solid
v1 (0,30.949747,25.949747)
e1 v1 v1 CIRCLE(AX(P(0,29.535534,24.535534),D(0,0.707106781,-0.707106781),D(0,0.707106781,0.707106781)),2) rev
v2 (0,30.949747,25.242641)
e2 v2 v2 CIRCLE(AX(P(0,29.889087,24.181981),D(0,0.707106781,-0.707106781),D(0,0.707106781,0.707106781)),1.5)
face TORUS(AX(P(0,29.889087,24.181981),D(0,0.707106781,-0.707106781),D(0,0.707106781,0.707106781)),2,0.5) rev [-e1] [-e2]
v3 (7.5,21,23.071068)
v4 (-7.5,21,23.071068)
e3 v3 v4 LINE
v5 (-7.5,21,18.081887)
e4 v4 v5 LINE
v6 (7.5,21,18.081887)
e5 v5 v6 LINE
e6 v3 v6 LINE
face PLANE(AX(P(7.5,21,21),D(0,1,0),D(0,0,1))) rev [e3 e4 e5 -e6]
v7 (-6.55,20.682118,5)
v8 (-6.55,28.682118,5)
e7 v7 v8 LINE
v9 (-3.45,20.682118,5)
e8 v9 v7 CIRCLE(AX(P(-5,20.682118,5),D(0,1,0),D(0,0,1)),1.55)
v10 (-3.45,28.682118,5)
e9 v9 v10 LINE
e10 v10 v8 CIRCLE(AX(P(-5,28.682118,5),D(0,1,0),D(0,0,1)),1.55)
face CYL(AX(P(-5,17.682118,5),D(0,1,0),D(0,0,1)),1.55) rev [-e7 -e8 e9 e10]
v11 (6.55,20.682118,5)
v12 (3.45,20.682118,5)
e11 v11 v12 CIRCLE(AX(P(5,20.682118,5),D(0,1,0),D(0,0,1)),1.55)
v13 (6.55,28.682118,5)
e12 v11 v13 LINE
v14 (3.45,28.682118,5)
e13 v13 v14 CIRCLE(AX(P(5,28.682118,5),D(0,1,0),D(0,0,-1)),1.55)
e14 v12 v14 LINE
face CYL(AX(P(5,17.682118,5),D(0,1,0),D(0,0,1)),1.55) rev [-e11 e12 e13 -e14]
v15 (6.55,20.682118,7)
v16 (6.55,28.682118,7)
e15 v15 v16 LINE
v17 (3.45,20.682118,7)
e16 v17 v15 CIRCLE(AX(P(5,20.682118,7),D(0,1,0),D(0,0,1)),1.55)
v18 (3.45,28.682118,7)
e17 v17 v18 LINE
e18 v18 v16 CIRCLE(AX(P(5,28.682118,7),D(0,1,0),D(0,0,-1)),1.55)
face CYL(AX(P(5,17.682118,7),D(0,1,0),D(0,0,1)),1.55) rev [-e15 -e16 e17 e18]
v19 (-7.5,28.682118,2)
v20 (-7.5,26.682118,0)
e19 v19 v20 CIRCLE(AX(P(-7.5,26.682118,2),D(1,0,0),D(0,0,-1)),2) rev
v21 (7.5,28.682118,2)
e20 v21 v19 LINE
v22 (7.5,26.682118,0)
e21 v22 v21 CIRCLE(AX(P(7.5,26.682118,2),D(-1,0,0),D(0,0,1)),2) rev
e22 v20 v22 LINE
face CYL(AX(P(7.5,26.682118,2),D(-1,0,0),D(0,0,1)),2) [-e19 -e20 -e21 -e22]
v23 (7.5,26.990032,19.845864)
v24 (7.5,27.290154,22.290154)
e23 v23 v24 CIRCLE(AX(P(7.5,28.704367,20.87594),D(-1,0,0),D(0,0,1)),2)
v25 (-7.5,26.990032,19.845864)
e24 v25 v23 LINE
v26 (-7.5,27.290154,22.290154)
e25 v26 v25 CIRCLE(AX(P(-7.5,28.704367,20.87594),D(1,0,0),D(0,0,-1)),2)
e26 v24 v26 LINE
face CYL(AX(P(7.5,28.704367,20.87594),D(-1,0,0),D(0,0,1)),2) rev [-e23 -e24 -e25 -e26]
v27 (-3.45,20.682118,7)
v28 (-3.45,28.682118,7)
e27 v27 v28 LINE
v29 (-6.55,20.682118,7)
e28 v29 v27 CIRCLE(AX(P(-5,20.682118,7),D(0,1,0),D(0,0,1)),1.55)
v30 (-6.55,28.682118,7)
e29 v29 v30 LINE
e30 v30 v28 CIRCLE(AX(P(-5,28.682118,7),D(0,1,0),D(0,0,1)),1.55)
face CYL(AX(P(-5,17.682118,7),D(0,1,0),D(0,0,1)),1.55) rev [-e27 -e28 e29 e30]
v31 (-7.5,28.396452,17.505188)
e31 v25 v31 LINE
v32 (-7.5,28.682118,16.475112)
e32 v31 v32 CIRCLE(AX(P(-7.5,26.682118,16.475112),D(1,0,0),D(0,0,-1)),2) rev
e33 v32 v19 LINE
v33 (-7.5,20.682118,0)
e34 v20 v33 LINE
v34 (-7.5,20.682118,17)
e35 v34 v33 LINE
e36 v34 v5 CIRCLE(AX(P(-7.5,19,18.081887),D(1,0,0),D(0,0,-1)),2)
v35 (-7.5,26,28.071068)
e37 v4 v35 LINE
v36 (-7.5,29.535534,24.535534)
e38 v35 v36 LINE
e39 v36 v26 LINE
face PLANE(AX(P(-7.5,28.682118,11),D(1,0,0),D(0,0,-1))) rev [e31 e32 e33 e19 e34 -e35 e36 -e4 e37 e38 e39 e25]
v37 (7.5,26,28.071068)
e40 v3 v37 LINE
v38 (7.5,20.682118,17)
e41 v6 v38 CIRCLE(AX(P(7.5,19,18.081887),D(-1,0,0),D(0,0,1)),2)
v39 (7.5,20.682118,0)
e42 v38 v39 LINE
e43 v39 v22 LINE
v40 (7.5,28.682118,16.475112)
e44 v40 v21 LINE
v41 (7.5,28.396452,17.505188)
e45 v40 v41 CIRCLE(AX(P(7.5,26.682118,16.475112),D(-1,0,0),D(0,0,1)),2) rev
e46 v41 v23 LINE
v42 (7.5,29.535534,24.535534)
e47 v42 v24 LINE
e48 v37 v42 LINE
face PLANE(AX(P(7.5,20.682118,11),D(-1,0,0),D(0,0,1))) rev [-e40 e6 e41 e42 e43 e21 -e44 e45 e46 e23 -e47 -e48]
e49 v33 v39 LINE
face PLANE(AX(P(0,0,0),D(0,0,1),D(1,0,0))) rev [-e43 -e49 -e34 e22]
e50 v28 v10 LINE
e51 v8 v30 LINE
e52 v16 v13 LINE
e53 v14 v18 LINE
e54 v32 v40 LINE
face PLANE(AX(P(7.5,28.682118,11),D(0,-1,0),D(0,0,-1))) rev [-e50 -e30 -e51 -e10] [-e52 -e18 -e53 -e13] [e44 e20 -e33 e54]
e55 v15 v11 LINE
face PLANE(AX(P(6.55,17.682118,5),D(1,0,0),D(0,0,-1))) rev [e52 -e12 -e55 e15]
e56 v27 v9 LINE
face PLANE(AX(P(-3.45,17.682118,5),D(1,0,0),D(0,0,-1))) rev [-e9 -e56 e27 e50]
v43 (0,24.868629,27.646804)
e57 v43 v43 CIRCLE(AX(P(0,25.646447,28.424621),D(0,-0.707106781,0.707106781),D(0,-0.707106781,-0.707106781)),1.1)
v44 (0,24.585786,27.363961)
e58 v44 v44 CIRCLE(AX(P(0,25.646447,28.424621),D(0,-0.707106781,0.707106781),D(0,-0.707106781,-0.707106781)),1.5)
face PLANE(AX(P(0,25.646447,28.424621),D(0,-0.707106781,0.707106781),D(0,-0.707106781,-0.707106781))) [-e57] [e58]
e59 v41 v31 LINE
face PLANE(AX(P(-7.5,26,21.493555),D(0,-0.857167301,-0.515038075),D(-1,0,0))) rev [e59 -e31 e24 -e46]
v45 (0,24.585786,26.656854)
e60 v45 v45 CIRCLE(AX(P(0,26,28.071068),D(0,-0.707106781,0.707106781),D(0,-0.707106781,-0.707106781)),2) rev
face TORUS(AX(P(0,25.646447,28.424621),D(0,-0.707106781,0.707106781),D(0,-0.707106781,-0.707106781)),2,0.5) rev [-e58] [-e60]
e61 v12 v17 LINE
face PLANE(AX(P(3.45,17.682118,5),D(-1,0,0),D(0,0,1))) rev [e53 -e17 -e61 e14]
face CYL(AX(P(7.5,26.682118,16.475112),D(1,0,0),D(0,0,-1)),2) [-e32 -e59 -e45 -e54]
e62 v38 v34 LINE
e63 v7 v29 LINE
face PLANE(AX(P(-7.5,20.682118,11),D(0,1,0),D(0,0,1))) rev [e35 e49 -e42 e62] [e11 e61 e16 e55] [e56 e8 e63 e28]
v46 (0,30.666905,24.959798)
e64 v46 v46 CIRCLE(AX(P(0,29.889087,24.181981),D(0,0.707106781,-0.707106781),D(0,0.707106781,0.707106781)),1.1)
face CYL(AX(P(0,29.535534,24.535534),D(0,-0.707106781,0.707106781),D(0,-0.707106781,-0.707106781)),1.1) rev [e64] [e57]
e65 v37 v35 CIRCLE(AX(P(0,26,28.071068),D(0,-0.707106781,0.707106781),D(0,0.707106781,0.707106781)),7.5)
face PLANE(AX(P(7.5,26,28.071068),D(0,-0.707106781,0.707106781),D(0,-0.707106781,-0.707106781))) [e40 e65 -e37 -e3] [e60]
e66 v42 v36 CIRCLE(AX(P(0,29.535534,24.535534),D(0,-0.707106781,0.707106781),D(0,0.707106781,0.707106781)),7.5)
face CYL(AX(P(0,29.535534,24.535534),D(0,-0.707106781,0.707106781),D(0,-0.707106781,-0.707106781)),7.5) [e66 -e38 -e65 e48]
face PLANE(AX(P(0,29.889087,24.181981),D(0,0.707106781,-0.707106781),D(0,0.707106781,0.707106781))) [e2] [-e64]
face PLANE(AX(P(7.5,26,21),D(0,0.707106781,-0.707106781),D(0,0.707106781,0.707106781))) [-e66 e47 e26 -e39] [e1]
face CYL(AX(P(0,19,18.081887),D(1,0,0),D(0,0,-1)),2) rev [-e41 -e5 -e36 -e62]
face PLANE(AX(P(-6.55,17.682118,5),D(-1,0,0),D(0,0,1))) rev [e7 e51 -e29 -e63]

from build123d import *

# Parameters (mm, degrees)
SKETCH_10_W         = 15
SKETCH_10_H         = 8
EXTRUDE_7_DEPTH     = 11
CUT_EXTRUDE_4_DEPTH = 11
SKETCH_12_W         = 15
SKETCH_12_H         = 6
EXTRUDE_8_DEPTH     = 6
SKETCH_14_W         = 15
SKETCH_14_H         = 5
EXTRUDE_9_DEPTH     = 4
EXTRUDE_10_DEPTH    = 15
EXTRUDE_11_DEPTH    = 5
SKETCH_19_R         = 1.1
CUT_EXTRUDE_5_DEPTH = 5
EXTRUDE_START       = 0.5
SKETCH_20_R         = 1.5
SKETCH_20_R_2       = 1.1
EXTRUDE_12_DEPTH    = 0.5
SKETCH_21_R         = 1.5
SKETCH_21_R_2       = 1.1
EXTRUDE_13_DEPTH    = 0.5
FILLET_4_R          = 0.5
CHAMFER_1_SIZE      = 4.493554602
CHAMFER_1_SIZE_2    = 2.7
FILLET_7_R          = 2
SKETCH_22_W         = 15
SKETCH_22_H         = 2
EXTRUDE_14_DEPTH    = 6
FILLET_8_R          = 2
FILLET_9_R          = 2


# Some blends are built 0.0001 mm under size
with BuildPart() as part:
    # 草图10 → 凸台-拉伸7 (new body)
    with BuildSketch(Plane.XY):
        with Locations((0, 24.68211788)):
            Rectangle(SKETCH_10_W, SKETCH_10_H)
    extrude(amount=EXTRUDE_7_DEPTH)

    # 草图11 → 切除-拉伸4 (cut)
    with BuildSketch(Plane(origin=(0, 28.68211788, 0), x_dir=(1, 0, 0), z_dir=(0, 1, 0))):
        with BuildLine():
            Line((-3.45, -5), (-3.45, -7))
            ThreePointArc((-3.45, -7), (-5, -8.55), (-6.55, -7))
            Line((-6.55, -7), (-6.55, -5))
            ThreePointArc((-6.55, -5), (-5, -3.45), (-3.45, -5))
        make_face()
        with BuildLine():
            Line((3.45, -5), (3.45, -7))
            ThreePointArc((3.45, -7), (5, -8.55), (6.55, -7))
            Line((6.55, -7), (6.55, -5))
            ThreePointArc((6.55, -5), (5, -3.45), (3.45, -5))
        make_face()
    extrude(amount=-CUT_EXTRUDE_4_DEPTH, mode=Mode.SUBTRACT)

    # 草图12 → 凸台-拉伸8 (add)
    with BuildSketch(Plane.XY.offset(11)):
        with Locations((0, 25.68211788)):
            Rectangle(SKETCH_12_W, SKETCH_12_H)
    extrude(amount=EXTRUDE_8_DEPTH)

    # 草图14 → 凸台-拉伸9 (add)
    with BuildSketch(Plane.XY.offset(17)):
        with Locations((0, 23.5)):
            Rectangle(SKETCH_14_W, SKETCH_14_H)
    extrude(amount=EXTRUDE_9_DEPTH)

    # 草图17 → 凸台-拉伸10 (add)
    with BuildSketch(Plane.ZY.offset(7.5)):
        Polygon((21, 26), (24.535533906, 29.535533906), (28.071067812, 26), (23.071067812, 21), (21, 21), align=None)
    extrude(amount=-EXTRUDE_10_DEPTH)

    # 草图18 → 凸台-拉伸11 (add)
    with BuildSketch(Plane(origin=(0, -1.035533906, 1.035533906), x_dir=(1, 0, 0), z_dir=(0, -0.7071067811865507, 0.7071067811865445))):
        with BuildLine():
            Line((7.5, 38.234018716), (-7.5, 38.234018716))
            ThreePointArc((-7.5, 38.234018716), (0, 45.734018716), (7.5, 38.234018716))
        make_face()
    extrude(amount=-EXTRUDE_11_DEPTH)

    # 草图19 → 切除-拉伸5 (cut)
    with BuildSketch(Plane(origin=(0, -1.035533906, 1.035533906), x_dir=(1, 0, 0), z_dir=(0, -0.7071067811865507, 0.7071067811865445))):
        with Locations(Location((0, 38.234018716, 0), (0, 0, 270))):
            Circle(SKETCH_19_R)
    extrude(amount=-CUT_EXTRUDE_5_DEPTH, mode=Mode.SUBTRACT)

    # 草图20 → 凸台-拉伸12 (add)
    with BuildSketch(Plane(origin=(0, -1.035533906, 1.035533906), x_dir=(1, 0, 0), z_dir=(0, -0.7071067811865507, 0.7071067811865445)).offset(EXTRUDE_START)):
        with Locations(Location((0, 38.234018716, 0), (0, 0, 270))):
            Circle(SKETCH_20_R)
        with Locations(Location((0, 38.234018716, 0), (0, 0, 270))):
            Circle(SKETCH_20_R_2, mode=Mode.SUBTRACT)
    extrude(amount=-EXTRUDE_12_DEPTH)

    # 草图21 → 凸台-拉伸13 (add)
    with BuildSketch(Plane(origin=(0, 2.5, -2.5), x_dir=(1, 0, 0), z_dir=(0, 0.7071067811865513, -0.7071067811865437))):
        with Locations(Location((0, -38.234018716, 0), (0, 0, 90))):
            Circle(SKETCH_21_R)
        with Locations(Location((0, -38.234018716, 0), (0, 0, 90))):
            Circle(SKETCH_21_R_2, mode=Mode.SUBTRACT)
    extrude(amount=EXTRUDE_13_DEPTH)

    # 圆角4
    fillet_4_edges = [part.edges().sort_by_distance(p)[0] for p in [
        (0, 27.060660172, 29.131727984),
        (0, 30.596194078, 25.596194078),
    ]]
    fillet(fillet_4_edges, radius=FILLET_4_R - 0.0001)  # a hair under: the kernel refuses the full size

    # 倒角1
    # the kernel refuses this chamfer: 4.493554602, 2.7 mm, written as the material it adds along each edge
    with BuildSketch(Plane(origin=(-7.5, 26, 17), x_dir=(0, -0.01991463058083334, 0.9998016840798123), z_dir=(1, 0, 0))) as chamfer_1_piece_1_section:
        Polygon((CHAMFER_1_SIZE * 0.999801684157, -CHAMFER_1_SIZE * 0.0199146305824), (-CHAMFER_1_SIZE_2 * 0.0199146305808, -CHAMFER_1_SIZE_2 * 0.99980168408), (0, 0), align=None)
    chamfer_1_piece_1 = extrude(amount=15, mode=Mode.PRIVATE)
    chamfer_1_piece_1 = split(chamfer_1_piece_1, bisect_by=Plane(origin=(0, 28.68211788, 18.477199106), z_dir=(0, -1, 0)), keep=Keep.TOP, mode=Mode.PRIVATE)
    add(chamfer_1_piece_1)

    # 圆角7
    fillet_7_edges = [part.edges().sort_by_distance(p)[0] for p in [
        (0, 26.18524881, 21.18524881),
        (0, 28.68211788, 17.029760846),
    ]]
    fillet(fillet_7_edges, radius=FILLET_7_R)

    # 草图22 → 凸台-拉伸14 (add)
    with BuildSketch(Plane.XY.offset(11)):
        with Locations((0, 21.68211788)):
            Rectangle(SKETCH_22_W, SKETCH_22_H)
    extrude(amount=EXTRUDE_14_DEPTH)

    # 圆角8
    # the kernel refuses this fillet: 2 mm, written as the material it adds along each edge
    with BuildSketch(Plane(origin=(7.5, 21, 17), x_dir=(0, -1.0, 7.298057631676466e-12), z_dir=(-1, 0, 0))) as fillet_8_piece_1:
        with BuildLine():
            CenterArc((2, 1.08188698), FILLET_8_R, 180, 32.747889427)
            Line((0, 1.08188698), (-0.04, 1.08188698))
            Line((-0.04, 1.08188698), (-0.04, 0))
            Line((-0.04, 0), (0, -0.04))
            ThreePointArc((0, -0.04), (0.15894106, -0.04), (0.284239762, -0.02163774))
            Line((0.284239762, -0.02163774), (0.31788212, 0))
        make_face()
    extrude(amount=15)

    # 圆角9
    fillet_9_edges = [part.edges().sort_by_distance(p)[0] for p in [
        (0, 28.68211788, 0),
    ]]
    fillet(fillet_9_edges, radius=FILLET_9_R)


solid = part.part
